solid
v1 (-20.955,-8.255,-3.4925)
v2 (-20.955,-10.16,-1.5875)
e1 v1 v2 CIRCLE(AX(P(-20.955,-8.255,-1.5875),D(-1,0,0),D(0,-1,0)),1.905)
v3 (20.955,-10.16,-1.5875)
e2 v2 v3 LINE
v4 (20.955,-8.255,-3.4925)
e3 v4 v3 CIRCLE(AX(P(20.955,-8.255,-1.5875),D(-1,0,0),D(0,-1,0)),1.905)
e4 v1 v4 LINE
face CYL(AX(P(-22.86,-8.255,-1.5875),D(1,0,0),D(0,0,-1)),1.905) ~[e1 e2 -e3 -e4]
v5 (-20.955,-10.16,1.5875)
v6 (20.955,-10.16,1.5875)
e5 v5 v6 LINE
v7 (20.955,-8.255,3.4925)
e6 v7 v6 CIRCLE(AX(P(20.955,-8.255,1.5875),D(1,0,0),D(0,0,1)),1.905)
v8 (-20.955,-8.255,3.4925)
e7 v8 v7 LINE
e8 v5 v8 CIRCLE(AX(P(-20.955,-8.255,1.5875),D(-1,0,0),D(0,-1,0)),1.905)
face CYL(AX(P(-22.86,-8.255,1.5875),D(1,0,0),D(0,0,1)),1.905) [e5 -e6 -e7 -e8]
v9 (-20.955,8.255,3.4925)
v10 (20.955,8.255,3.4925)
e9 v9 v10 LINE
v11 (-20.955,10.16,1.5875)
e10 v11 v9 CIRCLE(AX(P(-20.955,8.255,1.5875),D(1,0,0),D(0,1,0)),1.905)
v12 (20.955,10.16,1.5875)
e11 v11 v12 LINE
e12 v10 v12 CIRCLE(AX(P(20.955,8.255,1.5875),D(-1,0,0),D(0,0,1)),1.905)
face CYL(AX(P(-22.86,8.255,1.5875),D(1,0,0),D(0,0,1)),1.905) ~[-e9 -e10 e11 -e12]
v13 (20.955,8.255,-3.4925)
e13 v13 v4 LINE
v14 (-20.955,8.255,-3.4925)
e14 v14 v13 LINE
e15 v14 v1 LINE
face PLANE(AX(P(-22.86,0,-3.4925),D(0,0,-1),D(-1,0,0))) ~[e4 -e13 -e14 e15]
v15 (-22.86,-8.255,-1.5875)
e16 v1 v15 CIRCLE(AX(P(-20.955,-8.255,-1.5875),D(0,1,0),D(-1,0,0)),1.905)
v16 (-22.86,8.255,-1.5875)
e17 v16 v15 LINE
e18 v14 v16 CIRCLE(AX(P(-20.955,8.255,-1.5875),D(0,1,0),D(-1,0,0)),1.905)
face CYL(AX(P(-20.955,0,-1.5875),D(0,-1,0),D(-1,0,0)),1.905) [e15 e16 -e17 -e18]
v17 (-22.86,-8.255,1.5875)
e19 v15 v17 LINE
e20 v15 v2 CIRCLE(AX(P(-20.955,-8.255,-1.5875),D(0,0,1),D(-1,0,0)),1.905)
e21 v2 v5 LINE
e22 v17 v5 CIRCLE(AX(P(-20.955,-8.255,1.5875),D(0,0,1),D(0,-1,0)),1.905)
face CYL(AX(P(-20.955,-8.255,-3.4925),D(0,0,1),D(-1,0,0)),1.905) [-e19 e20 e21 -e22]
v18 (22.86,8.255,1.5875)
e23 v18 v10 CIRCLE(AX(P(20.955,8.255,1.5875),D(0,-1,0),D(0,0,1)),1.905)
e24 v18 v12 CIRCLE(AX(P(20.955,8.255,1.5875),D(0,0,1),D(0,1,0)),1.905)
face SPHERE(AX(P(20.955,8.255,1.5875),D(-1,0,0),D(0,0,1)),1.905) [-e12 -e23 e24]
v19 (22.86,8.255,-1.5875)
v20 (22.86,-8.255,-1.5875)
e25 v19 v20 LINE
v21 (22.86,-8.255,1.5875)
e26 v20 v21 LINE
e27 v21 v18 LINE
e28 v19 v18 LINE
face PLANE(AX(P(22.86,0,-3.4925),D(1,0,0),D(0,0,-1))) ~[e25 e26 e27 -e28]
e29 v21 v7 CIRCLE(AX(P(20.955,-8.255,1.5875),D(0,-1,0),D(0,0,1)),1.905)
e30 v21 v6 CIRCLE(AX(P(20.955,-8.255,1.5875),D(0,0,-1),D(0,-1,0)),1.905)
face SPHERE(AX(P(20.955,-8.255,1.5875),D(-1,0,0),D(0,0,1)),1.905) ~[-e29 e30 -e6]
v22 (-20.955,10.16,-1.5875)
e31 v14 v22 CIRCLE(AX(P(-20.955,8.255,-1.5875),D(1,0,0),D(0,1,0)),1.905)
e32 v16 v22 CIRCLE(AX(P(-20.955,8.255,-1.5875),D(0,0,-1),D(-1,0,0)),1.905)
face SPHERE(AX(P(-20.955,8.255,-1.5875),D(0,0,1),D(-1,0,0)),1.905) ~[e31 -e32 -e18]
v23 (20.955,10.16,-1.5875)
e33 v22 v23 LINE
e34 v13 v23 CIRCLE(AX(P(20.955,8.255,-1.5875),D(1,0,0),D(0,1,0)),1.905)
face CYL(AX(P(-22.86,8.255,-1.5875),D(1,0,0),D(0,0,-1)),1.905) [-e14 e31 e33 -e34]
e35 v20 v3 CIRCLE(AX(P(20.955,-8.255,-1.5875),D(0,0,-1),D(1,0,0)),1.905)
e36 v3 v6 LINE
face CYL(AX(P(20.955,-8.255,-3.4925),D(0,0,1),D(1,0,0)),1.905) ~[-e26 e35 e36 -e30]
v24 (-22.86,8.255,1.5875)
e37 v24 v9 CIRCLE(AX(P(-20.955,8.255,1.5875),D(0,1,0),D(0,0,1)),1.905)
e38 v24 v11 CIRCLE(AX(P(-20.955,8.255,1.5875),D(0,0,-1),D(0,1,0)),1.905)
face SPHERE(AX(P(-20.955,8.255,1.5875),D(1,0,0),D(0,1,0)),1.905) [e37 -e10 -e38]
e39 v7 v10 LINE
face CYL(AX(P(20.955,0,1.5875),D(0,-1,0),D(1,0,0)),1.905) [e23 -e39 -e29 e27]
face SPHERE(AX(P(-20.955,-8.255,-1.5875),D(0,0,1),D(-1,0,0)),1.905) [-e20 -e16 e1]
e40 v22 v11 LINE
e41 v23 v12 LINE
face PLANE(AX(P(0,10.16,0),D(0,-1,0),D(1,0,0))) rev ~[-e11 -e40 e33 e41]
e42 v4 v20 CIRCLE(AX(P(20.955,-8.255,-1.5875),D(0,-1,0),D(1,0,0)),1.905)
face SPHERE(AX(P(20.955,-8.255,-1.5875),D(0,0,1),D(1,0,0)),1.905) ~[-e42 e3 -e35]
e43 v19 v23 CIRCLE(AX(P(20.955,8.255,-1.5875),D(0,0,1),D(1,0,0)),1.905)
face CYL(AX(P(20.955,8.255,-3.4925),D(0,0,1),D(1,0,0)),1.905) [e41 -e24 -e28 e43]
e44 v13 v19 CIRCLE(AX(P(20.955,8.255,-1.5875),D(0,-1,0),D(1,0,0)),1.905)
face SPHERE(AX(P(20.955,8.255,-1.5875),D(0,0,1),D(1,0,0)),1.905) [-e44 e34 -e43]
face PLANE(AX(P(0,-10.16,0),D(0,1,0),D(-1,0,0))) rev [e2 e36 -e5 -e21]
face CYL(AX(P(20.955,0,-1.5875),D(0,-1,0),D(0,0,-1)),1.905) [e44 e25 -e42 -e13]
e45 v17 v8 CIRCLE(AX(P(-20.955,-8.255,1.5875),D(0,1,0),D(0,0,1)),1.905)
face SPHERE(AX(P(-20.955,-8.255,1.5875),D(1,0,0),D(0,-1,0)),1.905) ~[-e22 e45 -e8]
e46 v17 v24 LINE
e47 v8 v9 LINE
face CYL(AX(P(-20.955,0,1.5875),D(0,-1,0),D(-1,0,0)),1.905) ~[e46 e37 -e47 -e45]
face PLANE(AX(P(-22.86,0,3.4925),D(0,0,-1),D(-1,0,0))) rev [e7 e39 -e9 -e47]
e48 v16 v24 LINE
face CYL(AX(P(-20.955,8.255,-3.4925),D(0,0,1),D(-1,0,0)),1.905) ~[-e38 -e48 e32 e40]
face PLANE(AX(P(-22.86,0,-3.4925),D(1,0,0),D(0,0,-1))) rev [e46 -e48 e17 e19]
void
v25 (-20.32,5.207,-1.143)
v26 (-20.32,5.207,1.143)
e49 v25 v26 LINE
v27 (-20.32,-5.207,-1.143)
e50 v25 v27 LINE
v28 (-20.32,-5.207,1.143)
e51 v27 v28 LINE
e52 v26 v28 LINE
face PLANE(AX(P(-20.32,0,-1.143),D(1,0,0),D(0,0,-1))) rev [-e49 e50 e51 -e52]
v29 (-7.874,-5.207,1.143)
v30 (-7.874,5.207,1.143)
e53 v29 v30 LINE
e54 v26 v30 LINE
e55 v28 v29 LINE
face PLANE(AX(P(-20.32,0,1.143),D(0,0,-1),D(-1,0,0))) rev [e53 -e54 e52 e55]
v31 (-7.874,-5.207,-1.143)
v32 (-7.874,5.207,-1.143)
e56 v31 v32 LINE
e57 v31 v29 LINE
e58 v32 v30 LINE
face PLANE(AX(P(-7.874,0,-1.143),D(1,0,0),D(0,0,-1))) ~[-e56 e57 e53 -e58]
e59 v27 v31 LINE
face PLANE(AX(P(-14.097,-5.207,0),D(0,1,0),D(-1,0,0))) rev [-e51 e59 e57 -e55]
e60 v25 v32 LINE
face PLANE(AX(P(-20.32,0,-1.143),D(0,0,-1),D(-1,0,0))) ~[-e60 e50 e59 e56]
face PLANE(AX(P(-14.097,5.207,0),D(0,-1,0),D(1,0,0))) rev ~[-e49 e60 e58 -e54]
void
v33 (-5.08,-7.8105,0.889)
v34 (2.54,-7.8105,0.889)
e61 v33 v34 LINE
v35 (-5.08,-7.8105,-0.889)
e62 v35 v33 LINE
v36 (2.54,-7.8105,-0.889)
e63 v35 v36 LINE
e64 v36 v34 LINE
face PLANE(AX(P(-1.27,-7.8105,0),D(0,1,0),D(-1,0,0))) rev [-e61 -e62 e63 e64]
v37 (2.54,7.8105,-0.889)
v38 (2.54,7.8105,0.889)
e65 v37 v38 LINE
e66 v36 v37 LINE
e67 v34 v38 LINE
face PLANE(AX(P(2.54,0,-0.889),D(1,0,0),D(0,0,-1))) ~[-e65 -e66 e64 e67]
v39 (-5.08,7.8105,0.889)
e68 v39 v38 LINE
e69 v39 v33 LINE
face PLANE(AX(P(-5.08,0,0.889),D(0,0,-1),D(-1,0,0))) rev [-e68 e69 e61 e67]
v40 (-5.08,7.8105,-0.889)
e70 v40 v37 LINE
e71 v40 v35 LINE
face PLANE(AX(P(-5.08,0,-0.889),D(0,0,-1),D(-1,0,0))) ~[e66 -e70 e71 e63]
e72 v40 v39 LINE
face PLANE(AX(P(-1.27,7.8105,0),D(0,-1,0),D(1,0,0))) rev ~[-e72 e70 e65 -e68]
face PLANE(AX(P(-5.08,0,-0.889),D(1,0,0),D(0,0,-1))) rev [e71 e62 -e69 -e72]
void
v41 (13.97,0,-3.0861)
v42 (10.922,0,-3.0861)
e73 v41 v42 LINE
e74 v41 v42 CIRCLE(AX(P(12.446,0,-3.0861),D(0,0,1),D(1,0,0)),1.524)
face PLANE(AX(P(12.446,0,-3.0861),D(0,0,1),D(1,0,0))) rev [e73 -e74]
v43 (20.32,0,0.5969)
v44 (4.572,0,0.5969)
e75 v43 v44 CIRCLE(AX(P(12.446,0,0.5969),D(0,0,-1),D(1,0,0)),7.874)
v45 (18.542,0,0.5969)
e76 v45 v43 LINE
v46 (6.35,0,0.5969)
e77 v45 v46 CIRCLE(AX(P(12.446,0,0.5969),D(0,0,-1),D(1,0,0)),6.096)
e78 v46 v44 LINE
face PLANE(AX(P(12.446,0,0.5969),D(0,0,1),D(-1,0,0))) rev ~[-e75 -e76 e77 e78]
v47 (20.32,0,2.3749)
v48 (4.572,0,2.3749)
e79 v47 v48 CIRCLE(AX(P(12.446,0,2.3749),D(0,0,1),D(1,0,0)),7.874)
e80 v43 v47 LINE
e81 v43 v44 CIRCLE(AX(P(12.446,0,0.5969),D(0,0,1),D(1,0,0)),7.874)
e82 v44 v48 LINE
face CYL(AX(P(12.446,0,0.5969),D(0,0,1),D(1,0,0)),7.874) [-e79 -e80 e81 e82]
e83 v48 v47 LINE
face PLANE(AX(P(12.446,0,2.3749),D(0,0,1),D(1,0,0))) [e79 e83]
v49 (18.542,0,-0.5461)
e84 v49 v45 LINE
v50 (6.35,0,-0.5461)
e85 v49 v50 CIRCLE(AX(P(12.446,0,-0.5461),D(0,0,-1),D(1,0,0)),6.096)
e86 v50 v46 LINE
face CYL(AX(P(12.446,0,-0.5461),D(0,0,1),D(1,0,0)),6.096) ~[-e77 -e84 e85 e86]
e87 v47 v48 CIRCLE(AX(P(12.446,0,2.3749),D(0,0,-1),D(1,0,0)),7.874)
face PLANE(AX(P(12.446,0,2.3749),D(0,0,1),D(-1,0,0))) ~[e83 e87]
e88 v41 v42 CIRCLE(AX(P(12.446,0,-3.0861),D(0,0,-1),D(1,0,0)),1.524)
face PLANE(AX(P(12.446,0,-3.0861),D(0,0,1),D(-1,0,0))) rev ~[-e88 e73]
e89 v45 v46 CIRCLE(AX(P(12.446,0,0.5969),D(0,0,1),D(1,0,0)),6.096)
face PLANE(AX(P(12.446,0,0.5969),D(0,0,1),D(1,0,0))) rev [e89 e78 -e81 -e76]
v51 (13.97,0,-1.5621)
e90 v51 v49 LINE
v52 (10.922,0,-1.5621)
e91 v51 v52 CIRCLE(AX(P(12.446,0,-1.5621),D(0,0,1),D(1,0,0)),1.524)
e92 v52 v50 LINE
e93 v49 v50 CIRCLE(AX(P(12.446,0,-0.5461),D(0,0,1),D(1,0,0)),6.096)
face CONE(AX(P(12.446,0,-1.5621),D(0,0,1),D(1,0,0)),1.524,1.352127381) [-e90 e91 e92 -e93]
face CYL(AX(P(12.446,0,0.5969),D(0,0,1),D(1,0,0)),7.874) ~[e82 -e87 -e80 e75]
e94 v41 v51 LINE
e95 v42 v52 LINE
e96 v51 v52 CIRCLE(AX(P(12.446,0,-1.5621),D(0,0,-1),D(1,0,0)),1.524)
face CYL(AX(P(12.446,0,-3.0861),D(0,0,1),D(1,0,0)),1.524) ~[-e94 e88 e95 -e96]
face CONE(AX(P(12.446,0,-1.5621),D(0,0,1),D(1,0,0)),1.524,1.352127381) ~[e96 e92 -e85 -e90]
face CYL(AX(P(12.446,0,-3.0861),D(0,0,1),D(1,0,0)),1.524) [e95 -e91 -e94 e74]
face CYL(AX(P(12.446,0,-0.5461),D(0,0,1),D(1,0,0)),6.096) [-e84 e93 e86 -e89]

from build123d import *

# Parameters (mm, degrees)
F0_W     = 45.72
F0_H     = 6.985
F1_DEPTH = 10.16
F2_R     = 1.905
F6_ANGLE = 180
F3_W     = 12.446
F3_H     = 2.286
F7_DEPTH = 5.207
F4_W     = 7.62
F4_H     = 1.778
F8_DEPTH = 7.8105


# Not quite as in the source:
# - a length typed as a fraction of an inch, garbled in the dataset ("3 / 203.2 mm" for 3/8 in), is restored


with BuildPart() as f1:
    # F0 (on Front) → F1 (new body)
    with BuildSketch(Plane.XZ):
        Rectangle(F0_W, F0_H)
    extrude(amount=-F1_DEPTH)

    # F2
    f2_edges = [f1.edges().sort_by_distance(p)[0] for p in [
        (0, 10.16, 3.4925),
        (22.86, 5.08, 3.4925),
        (22.86, 10.16, 0),
        (22.86, 5.08, -3.4925),
        (-22.86, 10.16, 0),
        (-22.86, 5.08, -3.4925),
        (-22.86, 5.08, 3.4925),
        (0, 10.16, -3.4925),
    ]]
    fillet(f2_edges, radius=F2_R)

    # F5 (on face) → F6 (revolve, cut)
    with BuildSketch(Plane.XZ):
        Polygon((13.97, -1.5621), (18.542, -0.5461), (18.542, 0.5969), (20.32, 0.5969), (20.32, 2.3749), (12.446, 2.3749), (12.446, -3.0861), (13.97, -3.0861), align=None)
    revolve(axis=Axis((12.446, 0, -0.3556), (0, 0, 1)), revolution_arc=F6_ANGLE, mode=Mode.SUBTRACT)

    # F3 (on face) → F7 (cut)
    with BuildSketch(Plane.XZ):
        with Locations((-14.097, 0)):
            Rectangle(F3_W, F3_H)
    extrude(amount=-F7_DEPTH, mode=Mode.SUBTRACT)

    # F4 (on face) → F8 (cut)
    with BuildSketch(Plane.XZ):
        with Locations((-1.27, 0)):
            Rectangle(F4_W, F4_H)
    extrude(amount=-F8_DEPTH, mode=Mode.SUBTRACT)

    # F9: F1 across face


with BuildPart() as f1_1:
    add(f1.part)
    add(f1.part.mirror(Plane(origin=(-1.1723055417, 0, -0.108173269), x_dir=(1, 0, 0), z_dir=(0, -1, 0))))


solid = f1_1.part
